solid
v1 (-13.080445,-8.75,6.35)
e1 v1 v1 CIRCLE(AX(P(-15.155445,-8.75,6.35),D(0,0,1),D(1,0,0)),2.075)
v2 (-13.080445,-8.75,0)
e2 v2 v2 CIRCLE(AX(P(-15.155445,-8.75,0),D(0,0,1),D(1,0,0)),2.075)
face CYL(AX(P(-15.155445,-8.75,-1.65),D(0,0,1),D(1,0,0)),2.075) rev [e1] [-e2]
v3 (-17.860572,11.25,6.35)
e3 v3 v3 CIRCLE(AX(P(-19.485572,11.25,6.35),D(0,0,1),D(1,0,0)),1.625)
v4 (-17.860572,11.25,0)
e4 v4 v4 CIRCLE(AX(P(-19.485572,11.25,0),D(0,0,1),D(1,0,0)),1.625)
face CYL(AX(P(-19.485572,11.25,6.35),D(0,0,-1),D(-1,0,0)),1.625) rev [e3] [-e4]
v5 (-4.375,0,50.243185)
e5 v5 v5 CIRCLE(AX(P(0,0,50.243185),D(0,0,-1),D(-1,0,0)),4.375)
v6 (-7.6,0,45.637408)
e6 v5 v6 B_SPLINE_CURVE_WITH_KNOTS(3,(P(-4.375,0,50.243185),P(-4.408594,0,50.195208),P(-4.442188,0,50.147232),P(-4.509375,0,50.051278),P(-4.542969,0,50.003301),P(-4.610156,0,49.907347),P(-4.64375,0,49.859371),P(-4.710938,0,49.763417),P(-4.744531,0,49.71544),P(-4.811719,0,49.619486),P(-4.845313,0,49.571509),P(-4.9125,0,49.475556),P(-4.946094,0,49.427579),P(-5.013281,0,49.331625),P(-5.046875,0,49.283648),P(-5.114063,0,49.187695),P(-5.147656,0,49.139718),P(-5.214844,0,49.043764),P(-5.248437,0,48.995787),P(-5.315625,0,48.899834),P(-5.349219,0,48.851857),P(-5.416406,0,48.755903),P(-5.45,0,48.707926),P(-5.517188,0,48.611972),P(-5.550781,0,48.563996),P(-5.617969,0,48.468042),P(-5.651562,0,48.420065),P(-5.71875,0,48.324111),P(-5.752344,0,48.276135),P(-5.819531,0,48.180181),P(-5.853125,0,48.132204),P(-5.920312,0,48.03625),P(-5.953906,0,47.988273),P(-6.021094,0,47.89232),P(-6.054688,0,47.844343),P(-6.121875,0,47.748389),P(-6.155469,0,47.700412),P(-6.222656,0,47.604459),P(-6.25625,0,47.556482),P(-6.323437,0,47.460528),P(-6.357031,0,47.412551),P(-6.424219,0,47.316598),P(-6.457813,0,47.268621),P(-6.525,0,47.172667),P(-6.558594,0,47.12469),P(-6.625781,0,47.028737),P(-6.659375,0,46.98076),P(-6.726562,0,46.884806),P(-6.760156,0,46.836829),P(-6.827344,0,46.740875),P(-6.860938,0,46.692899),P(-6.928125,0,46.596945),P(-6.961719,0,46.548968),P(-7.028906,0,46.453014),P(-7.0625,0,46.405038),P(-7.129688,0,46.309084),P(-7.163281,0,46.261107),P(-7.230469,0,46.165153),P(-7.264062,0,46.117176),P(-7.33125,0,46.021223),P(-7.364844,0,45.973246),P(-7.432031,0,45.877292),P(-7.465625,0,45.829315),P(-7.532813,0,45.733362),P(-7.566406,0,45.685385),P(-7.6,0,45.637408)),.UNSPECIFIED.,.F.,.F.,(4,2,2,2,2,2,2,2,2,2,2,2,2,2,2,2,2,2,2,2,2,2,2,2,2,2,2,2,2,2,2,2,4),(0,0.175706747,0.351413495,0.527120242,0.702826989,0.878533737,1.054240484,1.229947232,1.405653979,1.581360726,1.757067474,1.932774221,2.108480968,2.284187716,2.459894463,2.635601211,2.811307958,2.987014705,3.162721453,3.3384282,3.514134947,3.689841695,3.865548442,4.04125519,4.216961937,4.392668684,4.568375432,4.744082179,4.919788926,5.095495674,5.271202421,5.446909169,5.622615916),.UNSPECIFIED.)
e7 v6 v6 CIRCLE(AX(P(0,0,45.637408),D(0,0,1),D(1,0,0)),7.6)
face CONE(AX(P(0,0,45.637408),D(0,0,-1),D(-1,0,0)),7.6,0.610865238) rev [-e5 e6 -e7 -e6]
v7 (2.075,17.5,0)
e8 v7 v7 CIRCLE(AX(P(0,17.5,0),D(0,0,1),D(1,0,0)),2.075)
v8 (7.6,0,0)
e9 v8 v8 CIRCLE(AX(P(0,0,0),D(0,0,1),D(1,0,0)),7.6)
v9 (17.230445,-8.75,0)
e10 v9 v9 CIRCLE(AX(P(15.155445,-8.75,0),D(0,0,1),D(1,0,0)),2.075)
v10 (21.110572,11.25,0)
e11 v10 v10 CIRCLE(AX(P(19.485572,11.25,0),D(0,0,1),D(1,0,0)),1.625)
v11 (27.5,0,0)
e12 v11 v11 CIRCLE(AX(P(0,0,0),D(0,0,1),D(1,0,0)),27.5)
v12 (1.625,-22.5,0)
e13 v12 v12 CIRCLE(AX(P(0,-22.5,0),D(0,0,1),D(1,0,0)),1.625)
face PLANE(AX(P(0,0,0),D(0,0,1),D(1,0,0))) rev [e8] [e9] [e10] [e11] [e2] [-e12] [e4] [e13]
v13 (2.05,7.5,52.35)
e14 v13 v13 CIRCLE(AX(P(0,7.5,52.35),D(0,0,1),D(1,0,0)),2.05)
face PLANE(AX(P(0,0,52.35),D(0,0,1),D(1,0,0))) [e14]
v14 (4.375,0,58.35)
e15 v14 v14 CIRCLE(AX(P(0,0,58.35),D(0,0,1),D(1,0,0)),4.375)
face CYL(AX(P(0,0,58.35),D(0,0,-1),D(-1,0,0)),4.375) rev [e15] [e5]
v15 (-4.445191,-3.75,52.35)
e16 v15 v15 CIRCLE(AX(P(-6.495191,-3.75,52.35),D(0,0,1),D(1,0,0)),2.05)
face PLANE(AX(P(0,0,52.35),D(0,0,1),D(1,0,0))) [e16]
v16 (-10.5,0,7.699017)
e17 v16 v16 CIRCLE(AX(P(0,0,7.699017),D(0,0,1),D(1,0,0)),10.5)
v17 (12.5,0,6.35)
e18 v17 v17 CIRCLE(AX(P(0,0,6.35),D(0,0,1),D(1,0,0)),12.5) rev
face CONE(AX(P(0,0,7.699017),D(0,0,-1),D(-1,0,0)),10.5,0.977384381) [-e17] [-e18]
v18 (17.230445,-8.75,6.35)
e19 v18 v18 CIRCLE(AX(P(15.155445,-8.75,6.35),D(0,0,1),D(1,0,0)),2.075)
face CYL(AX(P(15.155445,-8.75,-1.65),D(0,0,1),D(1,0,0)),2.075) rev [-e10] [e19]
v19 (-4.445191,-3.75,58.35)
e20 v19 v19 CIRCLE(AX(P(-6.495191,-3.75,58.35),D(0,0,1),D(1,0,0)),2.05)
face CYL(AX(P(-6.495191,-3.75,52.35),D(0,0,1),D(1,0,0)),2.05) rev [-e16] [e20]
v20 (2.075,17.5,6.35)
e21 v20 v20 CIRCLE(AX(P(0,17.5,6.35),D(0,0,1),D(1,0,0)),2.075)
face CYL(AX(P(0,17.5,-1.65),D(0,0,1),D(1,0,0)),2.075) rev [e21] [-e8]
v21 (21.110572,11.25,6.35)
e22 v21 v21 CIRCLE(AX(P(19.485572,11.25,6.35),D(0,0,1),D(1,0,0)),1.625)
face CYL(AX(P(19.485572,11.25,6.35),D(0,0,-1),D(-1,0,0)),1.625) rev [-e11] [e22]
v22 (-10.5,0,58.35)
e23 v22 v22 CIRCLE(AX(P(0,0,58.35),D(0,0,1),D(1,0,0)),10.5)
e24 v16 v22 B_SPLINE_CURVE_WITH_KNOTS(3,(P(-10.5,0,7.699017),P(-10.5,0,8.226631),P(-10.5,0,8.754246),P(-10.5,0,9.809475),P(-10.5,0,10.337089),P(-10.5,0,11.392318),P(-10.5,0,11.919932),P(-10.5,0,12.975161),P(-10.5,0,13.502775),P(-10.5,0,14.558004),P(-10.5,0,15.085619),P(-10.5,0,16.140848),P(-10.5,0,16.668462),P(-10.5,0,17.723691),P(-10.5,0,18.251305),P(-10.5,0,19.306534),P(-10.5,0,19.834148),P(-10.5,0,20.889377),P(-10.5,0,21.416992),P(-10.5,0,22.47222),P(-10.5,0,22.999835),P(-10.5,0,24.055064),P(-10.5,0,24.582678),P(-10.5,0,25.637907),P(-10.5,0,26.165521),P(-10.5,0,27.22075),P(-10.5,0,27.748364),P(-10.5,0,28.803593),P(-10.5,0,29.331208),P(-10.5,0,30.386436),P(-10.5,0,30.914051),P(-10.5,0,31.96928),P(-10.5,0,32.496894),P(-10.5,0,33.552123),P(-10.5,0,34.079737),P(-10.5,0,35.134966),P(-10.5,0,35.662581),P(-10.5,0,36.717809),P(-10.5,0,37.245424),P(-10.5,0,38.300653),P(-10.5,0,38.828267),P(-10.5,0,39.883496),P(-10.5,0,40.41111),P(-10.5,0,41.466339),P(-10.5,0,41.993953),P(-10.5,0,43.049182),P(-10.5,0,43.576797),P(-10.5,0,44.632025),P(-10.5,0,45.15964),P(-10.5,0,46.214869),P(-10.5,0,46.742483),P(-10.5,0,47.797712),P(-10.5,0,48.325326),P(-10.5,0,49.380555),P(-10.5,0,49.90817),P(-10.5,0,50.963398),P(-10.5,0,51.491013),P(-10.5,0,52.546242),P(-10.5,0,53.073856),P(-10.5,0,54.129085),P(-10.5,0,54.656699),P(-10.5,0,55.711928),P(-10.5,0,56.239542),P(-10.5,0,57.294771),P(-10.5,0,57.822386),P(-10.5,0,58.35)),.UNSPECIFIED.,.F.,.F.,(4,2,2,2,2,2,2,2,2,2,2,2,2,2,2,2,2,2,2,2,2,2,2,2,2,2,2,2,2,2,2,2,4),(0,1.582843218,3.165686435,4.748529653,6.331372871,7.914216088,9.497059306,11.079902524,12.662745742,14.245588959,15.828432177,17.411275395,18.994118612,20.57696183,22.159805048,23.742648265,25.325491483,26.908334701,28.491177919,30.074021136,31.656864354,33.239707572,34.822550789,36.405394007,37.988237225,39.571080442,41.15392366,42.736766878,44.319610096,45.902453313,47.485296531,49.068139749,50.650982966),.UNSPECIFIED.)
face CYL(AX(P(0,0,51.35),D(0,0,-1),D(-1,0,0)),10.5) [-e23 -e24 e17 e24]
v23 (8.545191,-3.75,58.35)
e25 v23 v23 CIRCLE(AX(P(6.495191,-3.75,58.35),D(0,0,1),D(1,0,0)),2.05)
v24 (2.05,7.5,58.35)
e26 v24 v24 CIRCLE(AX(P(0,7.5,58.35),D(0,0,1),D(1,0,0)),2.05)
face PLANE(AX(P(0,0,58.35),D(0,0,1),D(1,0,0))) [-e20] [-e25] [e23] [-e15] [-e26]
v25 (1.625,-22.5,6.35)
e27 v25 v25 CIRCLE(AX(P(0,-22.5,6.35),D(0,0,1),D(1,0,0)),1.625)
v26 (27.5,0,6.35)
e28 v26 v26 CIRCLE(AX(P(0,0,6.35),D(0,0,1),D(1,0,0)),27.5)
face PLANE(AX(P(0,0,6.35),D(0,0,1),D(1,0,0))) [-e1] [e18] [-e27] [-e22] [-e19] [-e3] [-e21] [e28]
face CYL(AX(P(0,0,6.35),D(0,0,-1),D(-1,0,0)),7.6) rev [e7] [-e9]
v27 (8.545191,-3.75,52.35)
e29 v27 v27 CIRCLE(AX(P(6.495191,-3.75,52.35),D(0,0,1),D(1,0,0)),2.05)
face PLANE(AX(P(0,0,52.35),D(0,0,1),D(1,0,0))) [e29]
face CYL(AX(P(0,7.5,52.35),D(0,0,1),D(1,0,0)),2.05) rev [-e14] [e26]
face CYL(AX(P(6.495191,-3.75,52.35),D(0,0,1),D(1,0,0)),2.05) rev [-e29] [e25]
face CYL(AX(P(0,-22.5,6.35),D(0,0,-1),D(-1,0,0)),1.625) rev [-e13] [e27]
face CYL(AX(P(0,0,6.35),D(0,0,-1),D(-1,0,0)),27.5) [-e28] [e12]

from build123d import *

# Parameters (mm, degrees)
ESQUISSE3_R         = 27.5
ESQUISSE3_R_2       = 1.625
ESQUISSE3_R_3       = 7.6
BOSS_EXTRU_1_DEPTH  = 6.35
ESQUISSE4_R         = 10.5
ESQUISSE4_R_2       = 7.6
BOSS_EXTRU_2_DEPTH  = 45
SKETCH1_R           = 10.5
SKETCH1_R_2         = 4.375
BOSS_EXTRUDE1_DEPTH = 7
SKETCH2_R           = 2.05
CUT_EXTRUDE1_DEPTH  = 6
CHAMFER2_SIZE       = 5.712592027
CHAMFER2_SIZE_2     = 4
CHAMFER3_SIZE       = 2
CHAMFER3_SIZE2      = 1.349017034
SKETCH3_R           = 2.075
CUT_EXTRUDE2_DEPTH  = 8


with BuildPart() as part:
    # Esquisse3 → Boss.-Extru.1 (new body)
    with BuildSketch(Plane.XY):
        Circle(ESQUISSE3_R)
        with Locations((-19.485571585, 11.25)):
            Circle(ESQUISSE3_R_2, mode=Mode.SUBTRACT)
        with Locations((19.485571585, 11.25)):
            Circle(ESQUISSE3_R_2, mode=Mode.SUBTRACT)
        with Locations((0, -22.5)):
            Circle(ESQUISSE3_R_2, mode=Mode.SUBTRACT)
        Circle(ESQUISSE3_R_3, mode=Mode.SUBTRACT)
    extrude(amount=BOSS_EXTRU_1_DEPTH)

    # Esquisse4 → Boss.-Extru.2 (add)
    with BuildSketch(Plane.XY.offset(6.35)):
        with Locations(Location((0, 0, 0), (0, 0, 180))):
            Circle(ESQUISSE4_R)
        Circle(ESQUISSE4_R_2, mode=Mode.SUBTRACT)
    extrude(amount=BOSS_EXTRU_2_DEPTH)

    # Sketch1 → Boss-Extrude1 (add)
    with BuildSketch(Plane.XY.offset(51.35)):
        with Locations(Location((0, 0, 0), (0, 0, 180))):
            Circle(SKETCH1_R)
        Circle(SKETCH1_R_2, mode=Mode.SUBTRACT)
    extrude(amount=BOSS_EXTRUDE1_DEPTH)

    # Sketch2 → Cut-Extrude1 (cut)
    with BuildSketch(Plane.XY.offset(58.35)):
        with Locations((0, 7.5)):
            Circle(SKETCH2_R)
        with Locations((-6.495190528, -3.75)):
            Circle(SKETCH2_R)
        with Locations((6.495190528, -3.75)):
            Circle(SKETCH2_R)
    extrude(amount=-CUT_EXTRUDE1_DEPTH, mode=Mode.SUBTRACT)

    # Chamfer2
    # the kernel refuses this chamfer: 5.712592027, 4 mm, written as the material it adds along each edge
    with BuildSketch(Plane(origin=(0, 0, 51.35), x_dir=(1, 0, 0), z_dir=(0, -1, 0))) as chamfer2_piece_1_section:
        Polygon((7.6, -CHAMFER2_SIZE), (7.6 - CHAMFER2_SIZE_2, 0), (7.6, 0), align=None)
    chamfer2_piece_1 = revolve(axis=Axis((0, 0, 51.35), (0, 0, 1)), mode=Mode.PRIVATE)
    chamfer2_piece_1 = chamfer2_piece_1 - Plane(origin=(0, 0, 47.891956694), x_dir=(1, 0, 0), z_dir=(0, 0, -1)) * Cylinder(4.375, 31, mode=Mode.PRIVATE)
    add(chamfer2_piece_1)

    # Chamfer3
    chamfer3_edges = [part.edges().sort_by_distance(p)[0] for p in [
        (10.5, 0, 6.35),
    ]]
    chamfer3_side = [part.faces().sort_by_distance(p)[0] for p in [
        (-26.722182541, 0, 6.35),
    ]]
    chamfer(chamfer3_edges, length=CHAMFER3_SIZE, length2=CHAMFER3_SIZE2, reference=chamfer3_side[0])

    # Sketch3 → Cut-Extrude2 (cut)
    with BuildSketch(Plane.XY.offset(6.35)):
        with Locations((0, 17.5)):
            Circle(SKETCH3_R)
        with Locations((-15.155444566, -8.75)):
            Circle(SKETCH3_R)
        with Locations((15.155444566, -8.75)):
            Circle(SKETCH3_R)
    extrude(amount=-CUT_EXTRUDE2_DEPTH, mode=Mode.SUBTRACT)


solid = part.part
